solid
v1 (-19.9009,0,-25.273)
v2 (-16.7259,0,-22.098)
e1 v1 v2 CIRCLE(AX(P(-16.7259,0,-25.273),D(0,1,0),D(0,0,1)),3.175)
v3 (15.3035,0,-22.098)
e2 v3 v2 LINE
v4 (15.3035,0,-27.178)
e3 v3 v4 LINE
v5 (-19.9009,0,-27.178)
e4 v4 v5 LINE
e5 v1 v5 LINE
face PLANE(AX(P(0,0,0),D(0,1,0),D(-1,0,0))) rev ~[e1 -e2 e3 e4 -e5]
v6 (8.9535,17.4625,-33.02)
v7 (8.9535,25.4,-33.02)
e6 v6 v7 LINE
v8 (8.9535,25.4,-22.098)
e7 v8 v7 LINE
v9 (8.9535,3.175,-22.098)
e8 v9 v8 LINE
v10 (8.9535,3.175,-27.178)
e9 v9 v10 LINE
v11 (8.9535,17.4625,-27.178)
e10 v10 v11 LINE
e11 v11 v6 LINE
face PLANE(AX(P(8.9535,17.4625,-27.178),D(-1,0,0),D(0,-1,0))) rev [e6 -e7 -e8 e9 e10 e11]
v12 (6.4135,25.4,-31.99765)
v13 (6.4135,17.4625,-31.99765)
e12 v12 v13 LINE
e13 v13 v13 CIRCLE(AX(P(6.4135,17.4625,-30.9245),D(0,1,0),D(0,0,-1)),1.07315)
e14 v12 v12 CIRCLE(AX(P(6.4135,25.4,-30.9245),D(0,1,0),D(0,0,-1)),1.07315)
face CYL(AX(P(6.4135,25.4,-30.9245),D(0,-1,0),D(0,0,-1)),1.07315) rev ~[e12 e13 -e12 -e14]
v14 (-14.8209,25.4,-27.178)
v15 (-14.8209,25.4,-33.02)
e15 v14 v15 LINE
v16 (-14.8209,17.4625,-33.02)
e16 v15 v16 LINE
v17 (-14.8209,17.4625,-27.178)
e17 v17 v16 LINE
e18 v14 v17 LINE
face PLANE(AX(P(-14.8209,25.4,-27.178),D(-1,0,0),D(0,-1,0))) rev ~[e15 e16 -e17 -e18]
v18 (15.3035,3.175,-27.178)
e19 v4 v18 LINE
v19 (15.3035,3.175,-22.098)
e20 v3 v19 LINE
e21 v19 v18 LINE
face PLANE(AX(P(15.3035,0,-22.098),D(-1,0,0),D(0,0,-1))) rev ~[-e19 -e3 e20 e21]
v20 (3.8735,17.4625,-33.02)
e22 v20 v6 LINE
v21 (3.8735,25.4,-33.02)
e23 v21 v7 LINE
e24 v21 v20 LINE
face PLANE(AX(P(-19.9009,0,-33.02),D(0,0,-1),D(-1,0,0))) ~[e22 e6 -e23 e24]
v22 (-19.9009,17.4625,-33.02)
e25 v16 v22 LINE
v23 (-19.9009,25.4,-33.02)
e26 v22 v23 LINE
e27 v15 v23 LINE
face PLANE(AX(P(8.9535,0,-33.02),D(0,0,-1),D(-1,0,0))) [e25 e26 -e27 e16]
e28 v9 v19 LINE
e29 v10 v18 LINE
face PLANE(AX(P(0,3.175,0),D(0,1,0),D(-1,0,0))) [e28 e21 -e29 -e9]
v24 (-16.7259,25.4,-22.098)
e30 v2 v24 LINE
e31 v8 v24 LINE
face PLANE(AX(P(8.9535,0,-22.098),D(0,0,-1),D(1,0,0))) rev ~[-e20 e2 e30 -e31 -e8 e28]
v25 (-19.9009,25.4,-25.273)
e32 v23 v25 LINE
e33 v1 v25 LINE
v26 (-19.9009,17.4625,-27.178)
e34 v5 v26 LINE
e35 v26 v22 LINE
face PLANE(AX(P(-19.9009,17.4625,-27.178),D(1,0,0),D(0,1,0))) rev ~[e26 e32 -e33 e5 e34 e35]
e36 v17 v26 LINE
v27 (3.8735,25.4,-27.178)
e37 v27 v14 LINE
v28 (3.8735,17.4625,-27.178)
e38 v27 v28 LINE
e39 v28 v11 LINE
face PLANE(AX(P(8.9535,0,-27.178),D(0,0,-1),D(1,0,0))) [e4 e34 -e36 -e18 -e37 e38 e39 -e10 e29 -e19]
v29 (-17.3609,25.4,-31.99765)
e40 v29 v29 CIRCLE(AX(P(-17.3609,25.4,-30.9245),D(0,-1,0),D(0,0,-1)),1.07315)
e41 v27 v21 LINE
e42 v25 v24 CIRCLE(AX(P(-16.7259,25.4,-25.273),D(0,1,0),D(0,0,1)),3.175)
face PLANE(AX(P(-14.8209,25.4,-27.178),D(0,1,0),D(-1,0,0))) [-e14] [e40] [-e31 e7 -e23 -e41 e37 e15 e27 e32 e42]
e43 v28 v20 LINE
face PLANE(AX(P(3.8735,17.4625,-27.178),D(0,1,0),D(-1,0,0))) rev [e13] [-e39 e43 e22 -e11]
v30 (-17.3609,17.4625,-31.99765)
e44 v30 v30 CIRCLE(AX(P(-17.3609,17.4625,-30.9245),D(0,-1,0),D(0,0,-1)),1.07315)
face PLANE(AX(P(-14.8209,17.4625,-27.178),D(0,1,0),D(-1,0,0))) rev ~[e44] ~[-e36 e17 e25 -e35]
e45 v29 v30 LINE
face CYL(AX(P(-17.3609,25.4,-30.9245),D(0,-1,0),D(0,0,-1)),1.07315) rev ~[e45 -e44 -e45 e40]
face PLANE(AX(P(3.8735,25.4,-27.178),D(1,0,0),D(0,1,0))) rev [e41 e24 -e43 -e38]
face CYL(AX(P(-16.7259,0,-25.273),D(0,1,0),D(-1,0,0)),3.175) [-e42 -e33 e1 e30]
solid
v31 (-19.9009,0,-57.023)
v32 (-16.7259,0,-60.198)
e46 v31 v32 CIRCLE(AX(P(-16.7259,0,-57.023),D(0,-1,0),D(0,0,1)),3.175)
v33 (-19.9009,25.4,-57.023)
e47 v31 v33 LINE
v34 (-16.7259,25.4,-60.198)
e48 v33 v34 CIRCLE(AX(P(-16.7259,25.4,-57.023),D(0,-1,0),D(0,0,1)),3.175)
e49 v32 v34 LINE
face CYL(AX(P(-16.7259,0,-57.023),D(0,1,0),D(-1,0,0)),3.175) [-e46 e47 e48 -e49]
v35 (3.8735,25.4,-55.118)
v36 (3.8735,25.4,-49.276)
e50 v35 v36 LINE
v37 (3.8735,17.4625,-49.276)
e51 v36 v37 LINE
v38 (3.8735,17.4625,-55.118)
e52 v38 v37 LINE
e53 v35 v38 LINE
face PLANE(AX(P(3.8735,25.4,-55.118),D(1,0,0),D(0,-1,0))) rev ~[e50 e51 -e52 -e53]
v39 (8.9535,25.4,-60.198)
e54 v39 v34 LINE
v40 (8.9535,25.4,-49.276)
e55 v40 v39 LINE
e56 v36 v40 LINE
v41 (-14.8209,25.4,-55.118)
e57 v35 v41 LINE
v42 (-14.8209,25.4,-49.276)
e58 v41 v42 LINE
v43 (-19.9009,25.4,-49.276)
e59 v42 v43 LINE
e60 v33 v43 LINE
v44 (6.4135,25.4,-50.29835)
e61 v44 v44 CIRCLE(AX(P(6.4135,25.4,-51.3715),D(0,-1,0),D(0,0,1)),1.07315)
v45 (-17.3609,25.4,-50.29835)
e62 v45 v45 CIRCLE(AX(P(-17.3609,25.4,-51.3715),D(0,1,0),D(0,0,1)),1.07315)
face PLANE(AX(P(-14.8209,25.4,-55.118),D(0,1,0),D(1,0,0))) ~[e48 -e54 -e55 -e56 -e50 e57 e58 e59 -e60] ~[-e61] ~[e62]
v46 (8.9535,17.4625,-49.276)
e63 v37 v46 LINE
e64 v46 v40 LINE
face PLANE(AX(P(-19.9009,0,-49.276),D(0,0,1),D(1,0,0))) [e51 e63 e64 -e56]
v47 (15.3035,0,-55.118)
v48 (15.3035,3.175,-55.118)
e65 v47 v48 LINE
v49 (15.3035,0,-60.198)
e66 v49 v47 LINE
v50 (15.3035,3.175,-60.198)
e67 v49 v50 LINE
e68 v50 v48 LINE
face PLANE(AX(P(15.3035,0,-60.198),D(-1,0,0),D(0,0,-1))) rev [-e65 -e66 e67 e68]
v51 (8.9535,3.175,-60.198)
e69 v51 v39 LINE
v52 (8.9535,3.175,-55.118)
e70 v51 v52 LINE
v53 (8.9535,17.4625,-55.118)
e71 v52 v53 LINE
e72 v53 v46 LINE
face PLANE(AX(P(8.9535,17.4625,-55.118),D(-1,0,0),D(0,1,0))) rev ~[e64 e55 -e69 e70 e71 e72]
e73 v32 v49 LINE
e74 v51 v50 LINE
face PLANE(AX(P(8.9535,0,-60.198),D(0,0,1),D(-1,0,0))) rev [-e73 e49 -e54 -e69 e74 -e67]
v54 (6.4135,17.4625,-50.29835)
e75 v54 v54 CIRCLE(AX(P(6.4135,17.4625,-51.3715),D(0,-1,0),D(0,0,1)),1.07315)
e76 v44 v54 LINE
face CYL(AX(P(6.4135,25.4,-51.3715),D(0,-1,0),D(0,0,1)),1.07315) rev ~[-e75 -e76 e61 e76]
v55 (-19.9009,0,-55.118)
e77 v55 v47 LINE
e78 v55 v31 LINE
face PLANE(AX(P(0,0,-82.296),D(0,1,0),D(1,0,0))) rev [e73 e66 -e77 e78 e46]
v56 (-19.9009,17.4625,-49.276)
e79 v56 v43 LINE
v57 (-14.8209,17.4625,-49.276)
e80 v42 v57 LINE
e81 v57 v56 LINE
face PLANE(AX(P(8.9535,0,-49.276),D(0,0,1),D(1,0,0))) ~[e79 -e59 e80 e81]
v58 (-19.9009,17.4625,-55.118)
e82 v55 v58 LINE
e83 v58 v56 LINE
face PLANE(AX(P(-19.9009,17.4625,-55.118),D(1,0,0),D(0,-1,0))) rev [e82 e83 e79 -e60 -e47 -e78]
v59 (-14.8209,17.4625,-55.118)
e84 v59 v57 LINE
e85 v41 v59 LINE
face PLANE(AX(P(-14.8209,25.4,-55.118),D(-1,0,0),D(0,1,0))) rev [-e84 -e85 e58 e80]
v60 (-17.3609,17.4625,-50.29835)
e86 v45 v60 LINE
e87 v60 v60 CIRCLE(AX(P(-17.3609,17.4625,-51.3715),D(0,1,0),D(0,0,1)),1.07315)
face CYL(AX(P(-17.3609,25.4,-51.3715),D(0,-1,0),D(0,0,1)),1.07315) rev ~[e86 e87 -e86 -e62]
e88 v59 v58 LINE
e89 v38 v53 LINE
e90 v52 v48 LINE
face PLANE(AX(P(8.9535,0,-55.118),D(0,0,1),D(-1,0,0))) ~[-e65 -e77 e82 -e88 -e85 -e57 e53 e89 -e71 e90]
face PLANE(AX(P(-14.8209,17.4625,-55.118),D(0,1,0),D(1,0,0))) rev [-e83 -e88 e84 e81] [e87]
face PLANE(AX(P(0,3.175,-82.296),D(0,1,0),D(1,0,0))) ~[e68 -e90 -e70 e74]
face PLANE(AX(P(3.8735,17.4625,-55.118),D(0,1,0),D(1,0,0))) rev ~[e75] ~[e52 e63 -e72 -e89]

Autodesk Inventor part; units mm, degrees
ref_plane "YZ Plane" through (0, 0, 0) normal (1, 0, 0) x (0, 1, 0)
ref_plane "XZ Plane" through (0, 0, 0) normal (0, 1, 0) x (-1, 0, 0)
sketch "Sketch1" plane through (0, 0, 0) normal (0, 1, 0) x (-1, 0, 0)
  line L0 (0, 0) -> (-8.9535, 0)
  line L1 (-8.9535, 0) -> (-8.9535, -82.296)
  line L2 (-8.9535, -82.296) -> (0, -82.296)
  line L3 (0, -82.296) -> (0, 0)
  line L4 (0, -41.148) -> (-8.9535, -41.148) construction
  line L5 (0, -22.098) -> (19.9009, -22.098)
  line L6 (19.9009, -22.098) -> (19.9009, -60.198)
  line L7 (19.9009, -60.198) -> (0, -60.198)
  line L8 (0, -60.198) -> (0, -22.098)
  line L9 (19.9009, -55.118) -> (0, -55.118)
  line L10 (0, -55.118) -> (0, -27.178)
  line L11 (0, -27.178) -> (19.9009, -27.178)
  line L12 (19.9009, -27.178) -> (19.9009, -55.118)
  line L13 (0, -55.118) -> (8.9662, -55.118)
  line L14 (8.9662, -55.118) -> (8.9662, -27.178)
  line L15 (8.9662, -27.178) -> (0, -27.178)
  line L16 (0, -27.178) -> (0, -55.118)
  line L17 (0, -27.178) -> (-8.9535, -27.178)
  line L18 (0, -55.118) -> (-8.9535, -55.118)
  line L19 (0, -22.098) -> (-8.9535, -22.098)
  line L20 (0, -60.198) -> (-8.9535, -60.198)
  line L21 (-8.9535, -27.178) -> (-21.6535, -27.178)
  line L22 (-21.6535, -27.178) -> (-21.6535, -14.478)
  line L23 (-21.6535, -14.478) -> (-15.3035, -14.478)
  line L24 (-8.9535, -13.6415) -> (-8.9535, -27.178)
  line L25 (-8.9535, -55.118) -> (-16.891, -55.118)
  line L26 (-16.891, -67.818) -> (-8.9535, -67.818)
  line L27 (-8.9535, -67.818) -> (-8.9535, -55.118)
  line L28 (-8.9535, -22.098) -> (-15.3035, -22.098)
  line L29 (-15.3035, -22.098) -> (-15.3035, -14.478)
  line L30 (-15.3035, -22.098) -> (-15.3035, -27.178)
  point P0 (-4.4768, 0)
  point P1 (0, -60.198)
  point P2 (0, -55.118)
  point P3 (19.9009, -27.178)
  point P4 (0, -55.118)
  point P5 (0, -60.198)
  point P6 (-8.9535, -67.818)
  point P7 (-8.9535, -13.6415)
  dimension "d0" = 82.296
  dimension "d1" = 8.9535
  dimension "d5" = 38.1
  dimension "d6" = 19.9009
  dimension "d11" = 27.94
  dimension "d28" = 8.9662
  dimension "d46" = 7.9375
  dimension "d48" = 12.7
  dimension "d50" = 12.7
  dimension "d51" = 6.35
  dimension "d52" = 6.35
extrude "Extrusion1" add sketch "Sketch1" along normal blind 3.175 contours L1 L21 L30 L28
extrude "Extrusion2" add sketch "Sketch1" along normal blind 25.4 contours L5 L6 L11 L3 | L3 L17 L1 L19 | L9 L6 L7 L3 | L3 L20 L1 L18
sketch "Sketch2" plane through (-19.9009, 0, -55.118) normal (0, 0, 1) x (1, 0, 0)
  line L0 (23.7744, 25.4) -> (23.7744, 17.4625)
  line L1 (23.7744, 17.4625) -> (28.8544, 17.4625)
  line L2 (28.8544, 17.4625) -> (28.8544, 25.4)
  line L3 (28.8544, 0) -> (28.8544, 25.4) projected
  line L4 (23.7744, 25.4) -> (28.8544, 25.4)
  line L5 (28.8544, 25.4) -> (28.8544, 17.4625)
  line L6 (19.9009, 0) -> (19.9009, 0) projected
  line L7 (0, 25.4) -> (28.8544, 25.4) projected
  point P0 (28.8544, 3.175)
  point P1 (36.7919, 0)
  dimension "d40" = 7.9375
  dimension "d41" = 5.08
  dimension "d44" = 7.9375
extrude "Extrusion3" add sketch "Sketch2" along normal blind 5.842
sketch "Sketch3" plane through (0, 25.4, 0) normal (0, 1, 0) x (1, 0, 0)
  line L0 (-19.9009, 55.118) -> (8.9535, 55.118) construction
  line L1 (3.8735, 49.276) -> (8.9535, 49.276) construction
  line L2 (6.4135, 49.276) -> (6.4135, 55.118) construction
  line L3 (-19.9009, 55.118) -> (8.9535, 55.118) construction
  point P0 (0, 0)
  point P1 (0, 55.118)
  point P2 (6.4135, 51.3715)
  point P3 (-8.9662, 55.118)
  point P4 (16.891, 55.118)
  dimension "d34" = 2.0955
  dimension "d35" = 0
hole "Hole1" at (6.4135, 25.4, -51.3715) direction (0, -1, 0) diameter 2.1463 depth 7.9375
ref_plane "Work Plane4" through (-19.9009, 0, -41.148) normal (0, 0, 1) x (1, 0, 0)
mirror "Mirror3" about plane through (-19.9009, 0, -41.148) normal (0, 0, 1) of "Hole1", "Extrusion3"
fillet "Fillet11" radius 3.175 2 edges at (-19.9009, 12.7, -22.098) (-19.9009, 12.7, -60.198)
ref_plane "Work Plane5" through (-5.4737, 3.175, -22.098) normal (1, 0, 0) x (0, 0, -1)
mirror "Mirror5" about plane through (-5.4737, 3.175, -22.098) normal (1, 0, 0) of "Hole1", "Extrusion3", "Mirror3"
mirror "Mirror6" about plane through (-19.9009, 0, -41.148) normal (0, 0, 1) of "Extrusion1"
properties part number "lepton mount"
